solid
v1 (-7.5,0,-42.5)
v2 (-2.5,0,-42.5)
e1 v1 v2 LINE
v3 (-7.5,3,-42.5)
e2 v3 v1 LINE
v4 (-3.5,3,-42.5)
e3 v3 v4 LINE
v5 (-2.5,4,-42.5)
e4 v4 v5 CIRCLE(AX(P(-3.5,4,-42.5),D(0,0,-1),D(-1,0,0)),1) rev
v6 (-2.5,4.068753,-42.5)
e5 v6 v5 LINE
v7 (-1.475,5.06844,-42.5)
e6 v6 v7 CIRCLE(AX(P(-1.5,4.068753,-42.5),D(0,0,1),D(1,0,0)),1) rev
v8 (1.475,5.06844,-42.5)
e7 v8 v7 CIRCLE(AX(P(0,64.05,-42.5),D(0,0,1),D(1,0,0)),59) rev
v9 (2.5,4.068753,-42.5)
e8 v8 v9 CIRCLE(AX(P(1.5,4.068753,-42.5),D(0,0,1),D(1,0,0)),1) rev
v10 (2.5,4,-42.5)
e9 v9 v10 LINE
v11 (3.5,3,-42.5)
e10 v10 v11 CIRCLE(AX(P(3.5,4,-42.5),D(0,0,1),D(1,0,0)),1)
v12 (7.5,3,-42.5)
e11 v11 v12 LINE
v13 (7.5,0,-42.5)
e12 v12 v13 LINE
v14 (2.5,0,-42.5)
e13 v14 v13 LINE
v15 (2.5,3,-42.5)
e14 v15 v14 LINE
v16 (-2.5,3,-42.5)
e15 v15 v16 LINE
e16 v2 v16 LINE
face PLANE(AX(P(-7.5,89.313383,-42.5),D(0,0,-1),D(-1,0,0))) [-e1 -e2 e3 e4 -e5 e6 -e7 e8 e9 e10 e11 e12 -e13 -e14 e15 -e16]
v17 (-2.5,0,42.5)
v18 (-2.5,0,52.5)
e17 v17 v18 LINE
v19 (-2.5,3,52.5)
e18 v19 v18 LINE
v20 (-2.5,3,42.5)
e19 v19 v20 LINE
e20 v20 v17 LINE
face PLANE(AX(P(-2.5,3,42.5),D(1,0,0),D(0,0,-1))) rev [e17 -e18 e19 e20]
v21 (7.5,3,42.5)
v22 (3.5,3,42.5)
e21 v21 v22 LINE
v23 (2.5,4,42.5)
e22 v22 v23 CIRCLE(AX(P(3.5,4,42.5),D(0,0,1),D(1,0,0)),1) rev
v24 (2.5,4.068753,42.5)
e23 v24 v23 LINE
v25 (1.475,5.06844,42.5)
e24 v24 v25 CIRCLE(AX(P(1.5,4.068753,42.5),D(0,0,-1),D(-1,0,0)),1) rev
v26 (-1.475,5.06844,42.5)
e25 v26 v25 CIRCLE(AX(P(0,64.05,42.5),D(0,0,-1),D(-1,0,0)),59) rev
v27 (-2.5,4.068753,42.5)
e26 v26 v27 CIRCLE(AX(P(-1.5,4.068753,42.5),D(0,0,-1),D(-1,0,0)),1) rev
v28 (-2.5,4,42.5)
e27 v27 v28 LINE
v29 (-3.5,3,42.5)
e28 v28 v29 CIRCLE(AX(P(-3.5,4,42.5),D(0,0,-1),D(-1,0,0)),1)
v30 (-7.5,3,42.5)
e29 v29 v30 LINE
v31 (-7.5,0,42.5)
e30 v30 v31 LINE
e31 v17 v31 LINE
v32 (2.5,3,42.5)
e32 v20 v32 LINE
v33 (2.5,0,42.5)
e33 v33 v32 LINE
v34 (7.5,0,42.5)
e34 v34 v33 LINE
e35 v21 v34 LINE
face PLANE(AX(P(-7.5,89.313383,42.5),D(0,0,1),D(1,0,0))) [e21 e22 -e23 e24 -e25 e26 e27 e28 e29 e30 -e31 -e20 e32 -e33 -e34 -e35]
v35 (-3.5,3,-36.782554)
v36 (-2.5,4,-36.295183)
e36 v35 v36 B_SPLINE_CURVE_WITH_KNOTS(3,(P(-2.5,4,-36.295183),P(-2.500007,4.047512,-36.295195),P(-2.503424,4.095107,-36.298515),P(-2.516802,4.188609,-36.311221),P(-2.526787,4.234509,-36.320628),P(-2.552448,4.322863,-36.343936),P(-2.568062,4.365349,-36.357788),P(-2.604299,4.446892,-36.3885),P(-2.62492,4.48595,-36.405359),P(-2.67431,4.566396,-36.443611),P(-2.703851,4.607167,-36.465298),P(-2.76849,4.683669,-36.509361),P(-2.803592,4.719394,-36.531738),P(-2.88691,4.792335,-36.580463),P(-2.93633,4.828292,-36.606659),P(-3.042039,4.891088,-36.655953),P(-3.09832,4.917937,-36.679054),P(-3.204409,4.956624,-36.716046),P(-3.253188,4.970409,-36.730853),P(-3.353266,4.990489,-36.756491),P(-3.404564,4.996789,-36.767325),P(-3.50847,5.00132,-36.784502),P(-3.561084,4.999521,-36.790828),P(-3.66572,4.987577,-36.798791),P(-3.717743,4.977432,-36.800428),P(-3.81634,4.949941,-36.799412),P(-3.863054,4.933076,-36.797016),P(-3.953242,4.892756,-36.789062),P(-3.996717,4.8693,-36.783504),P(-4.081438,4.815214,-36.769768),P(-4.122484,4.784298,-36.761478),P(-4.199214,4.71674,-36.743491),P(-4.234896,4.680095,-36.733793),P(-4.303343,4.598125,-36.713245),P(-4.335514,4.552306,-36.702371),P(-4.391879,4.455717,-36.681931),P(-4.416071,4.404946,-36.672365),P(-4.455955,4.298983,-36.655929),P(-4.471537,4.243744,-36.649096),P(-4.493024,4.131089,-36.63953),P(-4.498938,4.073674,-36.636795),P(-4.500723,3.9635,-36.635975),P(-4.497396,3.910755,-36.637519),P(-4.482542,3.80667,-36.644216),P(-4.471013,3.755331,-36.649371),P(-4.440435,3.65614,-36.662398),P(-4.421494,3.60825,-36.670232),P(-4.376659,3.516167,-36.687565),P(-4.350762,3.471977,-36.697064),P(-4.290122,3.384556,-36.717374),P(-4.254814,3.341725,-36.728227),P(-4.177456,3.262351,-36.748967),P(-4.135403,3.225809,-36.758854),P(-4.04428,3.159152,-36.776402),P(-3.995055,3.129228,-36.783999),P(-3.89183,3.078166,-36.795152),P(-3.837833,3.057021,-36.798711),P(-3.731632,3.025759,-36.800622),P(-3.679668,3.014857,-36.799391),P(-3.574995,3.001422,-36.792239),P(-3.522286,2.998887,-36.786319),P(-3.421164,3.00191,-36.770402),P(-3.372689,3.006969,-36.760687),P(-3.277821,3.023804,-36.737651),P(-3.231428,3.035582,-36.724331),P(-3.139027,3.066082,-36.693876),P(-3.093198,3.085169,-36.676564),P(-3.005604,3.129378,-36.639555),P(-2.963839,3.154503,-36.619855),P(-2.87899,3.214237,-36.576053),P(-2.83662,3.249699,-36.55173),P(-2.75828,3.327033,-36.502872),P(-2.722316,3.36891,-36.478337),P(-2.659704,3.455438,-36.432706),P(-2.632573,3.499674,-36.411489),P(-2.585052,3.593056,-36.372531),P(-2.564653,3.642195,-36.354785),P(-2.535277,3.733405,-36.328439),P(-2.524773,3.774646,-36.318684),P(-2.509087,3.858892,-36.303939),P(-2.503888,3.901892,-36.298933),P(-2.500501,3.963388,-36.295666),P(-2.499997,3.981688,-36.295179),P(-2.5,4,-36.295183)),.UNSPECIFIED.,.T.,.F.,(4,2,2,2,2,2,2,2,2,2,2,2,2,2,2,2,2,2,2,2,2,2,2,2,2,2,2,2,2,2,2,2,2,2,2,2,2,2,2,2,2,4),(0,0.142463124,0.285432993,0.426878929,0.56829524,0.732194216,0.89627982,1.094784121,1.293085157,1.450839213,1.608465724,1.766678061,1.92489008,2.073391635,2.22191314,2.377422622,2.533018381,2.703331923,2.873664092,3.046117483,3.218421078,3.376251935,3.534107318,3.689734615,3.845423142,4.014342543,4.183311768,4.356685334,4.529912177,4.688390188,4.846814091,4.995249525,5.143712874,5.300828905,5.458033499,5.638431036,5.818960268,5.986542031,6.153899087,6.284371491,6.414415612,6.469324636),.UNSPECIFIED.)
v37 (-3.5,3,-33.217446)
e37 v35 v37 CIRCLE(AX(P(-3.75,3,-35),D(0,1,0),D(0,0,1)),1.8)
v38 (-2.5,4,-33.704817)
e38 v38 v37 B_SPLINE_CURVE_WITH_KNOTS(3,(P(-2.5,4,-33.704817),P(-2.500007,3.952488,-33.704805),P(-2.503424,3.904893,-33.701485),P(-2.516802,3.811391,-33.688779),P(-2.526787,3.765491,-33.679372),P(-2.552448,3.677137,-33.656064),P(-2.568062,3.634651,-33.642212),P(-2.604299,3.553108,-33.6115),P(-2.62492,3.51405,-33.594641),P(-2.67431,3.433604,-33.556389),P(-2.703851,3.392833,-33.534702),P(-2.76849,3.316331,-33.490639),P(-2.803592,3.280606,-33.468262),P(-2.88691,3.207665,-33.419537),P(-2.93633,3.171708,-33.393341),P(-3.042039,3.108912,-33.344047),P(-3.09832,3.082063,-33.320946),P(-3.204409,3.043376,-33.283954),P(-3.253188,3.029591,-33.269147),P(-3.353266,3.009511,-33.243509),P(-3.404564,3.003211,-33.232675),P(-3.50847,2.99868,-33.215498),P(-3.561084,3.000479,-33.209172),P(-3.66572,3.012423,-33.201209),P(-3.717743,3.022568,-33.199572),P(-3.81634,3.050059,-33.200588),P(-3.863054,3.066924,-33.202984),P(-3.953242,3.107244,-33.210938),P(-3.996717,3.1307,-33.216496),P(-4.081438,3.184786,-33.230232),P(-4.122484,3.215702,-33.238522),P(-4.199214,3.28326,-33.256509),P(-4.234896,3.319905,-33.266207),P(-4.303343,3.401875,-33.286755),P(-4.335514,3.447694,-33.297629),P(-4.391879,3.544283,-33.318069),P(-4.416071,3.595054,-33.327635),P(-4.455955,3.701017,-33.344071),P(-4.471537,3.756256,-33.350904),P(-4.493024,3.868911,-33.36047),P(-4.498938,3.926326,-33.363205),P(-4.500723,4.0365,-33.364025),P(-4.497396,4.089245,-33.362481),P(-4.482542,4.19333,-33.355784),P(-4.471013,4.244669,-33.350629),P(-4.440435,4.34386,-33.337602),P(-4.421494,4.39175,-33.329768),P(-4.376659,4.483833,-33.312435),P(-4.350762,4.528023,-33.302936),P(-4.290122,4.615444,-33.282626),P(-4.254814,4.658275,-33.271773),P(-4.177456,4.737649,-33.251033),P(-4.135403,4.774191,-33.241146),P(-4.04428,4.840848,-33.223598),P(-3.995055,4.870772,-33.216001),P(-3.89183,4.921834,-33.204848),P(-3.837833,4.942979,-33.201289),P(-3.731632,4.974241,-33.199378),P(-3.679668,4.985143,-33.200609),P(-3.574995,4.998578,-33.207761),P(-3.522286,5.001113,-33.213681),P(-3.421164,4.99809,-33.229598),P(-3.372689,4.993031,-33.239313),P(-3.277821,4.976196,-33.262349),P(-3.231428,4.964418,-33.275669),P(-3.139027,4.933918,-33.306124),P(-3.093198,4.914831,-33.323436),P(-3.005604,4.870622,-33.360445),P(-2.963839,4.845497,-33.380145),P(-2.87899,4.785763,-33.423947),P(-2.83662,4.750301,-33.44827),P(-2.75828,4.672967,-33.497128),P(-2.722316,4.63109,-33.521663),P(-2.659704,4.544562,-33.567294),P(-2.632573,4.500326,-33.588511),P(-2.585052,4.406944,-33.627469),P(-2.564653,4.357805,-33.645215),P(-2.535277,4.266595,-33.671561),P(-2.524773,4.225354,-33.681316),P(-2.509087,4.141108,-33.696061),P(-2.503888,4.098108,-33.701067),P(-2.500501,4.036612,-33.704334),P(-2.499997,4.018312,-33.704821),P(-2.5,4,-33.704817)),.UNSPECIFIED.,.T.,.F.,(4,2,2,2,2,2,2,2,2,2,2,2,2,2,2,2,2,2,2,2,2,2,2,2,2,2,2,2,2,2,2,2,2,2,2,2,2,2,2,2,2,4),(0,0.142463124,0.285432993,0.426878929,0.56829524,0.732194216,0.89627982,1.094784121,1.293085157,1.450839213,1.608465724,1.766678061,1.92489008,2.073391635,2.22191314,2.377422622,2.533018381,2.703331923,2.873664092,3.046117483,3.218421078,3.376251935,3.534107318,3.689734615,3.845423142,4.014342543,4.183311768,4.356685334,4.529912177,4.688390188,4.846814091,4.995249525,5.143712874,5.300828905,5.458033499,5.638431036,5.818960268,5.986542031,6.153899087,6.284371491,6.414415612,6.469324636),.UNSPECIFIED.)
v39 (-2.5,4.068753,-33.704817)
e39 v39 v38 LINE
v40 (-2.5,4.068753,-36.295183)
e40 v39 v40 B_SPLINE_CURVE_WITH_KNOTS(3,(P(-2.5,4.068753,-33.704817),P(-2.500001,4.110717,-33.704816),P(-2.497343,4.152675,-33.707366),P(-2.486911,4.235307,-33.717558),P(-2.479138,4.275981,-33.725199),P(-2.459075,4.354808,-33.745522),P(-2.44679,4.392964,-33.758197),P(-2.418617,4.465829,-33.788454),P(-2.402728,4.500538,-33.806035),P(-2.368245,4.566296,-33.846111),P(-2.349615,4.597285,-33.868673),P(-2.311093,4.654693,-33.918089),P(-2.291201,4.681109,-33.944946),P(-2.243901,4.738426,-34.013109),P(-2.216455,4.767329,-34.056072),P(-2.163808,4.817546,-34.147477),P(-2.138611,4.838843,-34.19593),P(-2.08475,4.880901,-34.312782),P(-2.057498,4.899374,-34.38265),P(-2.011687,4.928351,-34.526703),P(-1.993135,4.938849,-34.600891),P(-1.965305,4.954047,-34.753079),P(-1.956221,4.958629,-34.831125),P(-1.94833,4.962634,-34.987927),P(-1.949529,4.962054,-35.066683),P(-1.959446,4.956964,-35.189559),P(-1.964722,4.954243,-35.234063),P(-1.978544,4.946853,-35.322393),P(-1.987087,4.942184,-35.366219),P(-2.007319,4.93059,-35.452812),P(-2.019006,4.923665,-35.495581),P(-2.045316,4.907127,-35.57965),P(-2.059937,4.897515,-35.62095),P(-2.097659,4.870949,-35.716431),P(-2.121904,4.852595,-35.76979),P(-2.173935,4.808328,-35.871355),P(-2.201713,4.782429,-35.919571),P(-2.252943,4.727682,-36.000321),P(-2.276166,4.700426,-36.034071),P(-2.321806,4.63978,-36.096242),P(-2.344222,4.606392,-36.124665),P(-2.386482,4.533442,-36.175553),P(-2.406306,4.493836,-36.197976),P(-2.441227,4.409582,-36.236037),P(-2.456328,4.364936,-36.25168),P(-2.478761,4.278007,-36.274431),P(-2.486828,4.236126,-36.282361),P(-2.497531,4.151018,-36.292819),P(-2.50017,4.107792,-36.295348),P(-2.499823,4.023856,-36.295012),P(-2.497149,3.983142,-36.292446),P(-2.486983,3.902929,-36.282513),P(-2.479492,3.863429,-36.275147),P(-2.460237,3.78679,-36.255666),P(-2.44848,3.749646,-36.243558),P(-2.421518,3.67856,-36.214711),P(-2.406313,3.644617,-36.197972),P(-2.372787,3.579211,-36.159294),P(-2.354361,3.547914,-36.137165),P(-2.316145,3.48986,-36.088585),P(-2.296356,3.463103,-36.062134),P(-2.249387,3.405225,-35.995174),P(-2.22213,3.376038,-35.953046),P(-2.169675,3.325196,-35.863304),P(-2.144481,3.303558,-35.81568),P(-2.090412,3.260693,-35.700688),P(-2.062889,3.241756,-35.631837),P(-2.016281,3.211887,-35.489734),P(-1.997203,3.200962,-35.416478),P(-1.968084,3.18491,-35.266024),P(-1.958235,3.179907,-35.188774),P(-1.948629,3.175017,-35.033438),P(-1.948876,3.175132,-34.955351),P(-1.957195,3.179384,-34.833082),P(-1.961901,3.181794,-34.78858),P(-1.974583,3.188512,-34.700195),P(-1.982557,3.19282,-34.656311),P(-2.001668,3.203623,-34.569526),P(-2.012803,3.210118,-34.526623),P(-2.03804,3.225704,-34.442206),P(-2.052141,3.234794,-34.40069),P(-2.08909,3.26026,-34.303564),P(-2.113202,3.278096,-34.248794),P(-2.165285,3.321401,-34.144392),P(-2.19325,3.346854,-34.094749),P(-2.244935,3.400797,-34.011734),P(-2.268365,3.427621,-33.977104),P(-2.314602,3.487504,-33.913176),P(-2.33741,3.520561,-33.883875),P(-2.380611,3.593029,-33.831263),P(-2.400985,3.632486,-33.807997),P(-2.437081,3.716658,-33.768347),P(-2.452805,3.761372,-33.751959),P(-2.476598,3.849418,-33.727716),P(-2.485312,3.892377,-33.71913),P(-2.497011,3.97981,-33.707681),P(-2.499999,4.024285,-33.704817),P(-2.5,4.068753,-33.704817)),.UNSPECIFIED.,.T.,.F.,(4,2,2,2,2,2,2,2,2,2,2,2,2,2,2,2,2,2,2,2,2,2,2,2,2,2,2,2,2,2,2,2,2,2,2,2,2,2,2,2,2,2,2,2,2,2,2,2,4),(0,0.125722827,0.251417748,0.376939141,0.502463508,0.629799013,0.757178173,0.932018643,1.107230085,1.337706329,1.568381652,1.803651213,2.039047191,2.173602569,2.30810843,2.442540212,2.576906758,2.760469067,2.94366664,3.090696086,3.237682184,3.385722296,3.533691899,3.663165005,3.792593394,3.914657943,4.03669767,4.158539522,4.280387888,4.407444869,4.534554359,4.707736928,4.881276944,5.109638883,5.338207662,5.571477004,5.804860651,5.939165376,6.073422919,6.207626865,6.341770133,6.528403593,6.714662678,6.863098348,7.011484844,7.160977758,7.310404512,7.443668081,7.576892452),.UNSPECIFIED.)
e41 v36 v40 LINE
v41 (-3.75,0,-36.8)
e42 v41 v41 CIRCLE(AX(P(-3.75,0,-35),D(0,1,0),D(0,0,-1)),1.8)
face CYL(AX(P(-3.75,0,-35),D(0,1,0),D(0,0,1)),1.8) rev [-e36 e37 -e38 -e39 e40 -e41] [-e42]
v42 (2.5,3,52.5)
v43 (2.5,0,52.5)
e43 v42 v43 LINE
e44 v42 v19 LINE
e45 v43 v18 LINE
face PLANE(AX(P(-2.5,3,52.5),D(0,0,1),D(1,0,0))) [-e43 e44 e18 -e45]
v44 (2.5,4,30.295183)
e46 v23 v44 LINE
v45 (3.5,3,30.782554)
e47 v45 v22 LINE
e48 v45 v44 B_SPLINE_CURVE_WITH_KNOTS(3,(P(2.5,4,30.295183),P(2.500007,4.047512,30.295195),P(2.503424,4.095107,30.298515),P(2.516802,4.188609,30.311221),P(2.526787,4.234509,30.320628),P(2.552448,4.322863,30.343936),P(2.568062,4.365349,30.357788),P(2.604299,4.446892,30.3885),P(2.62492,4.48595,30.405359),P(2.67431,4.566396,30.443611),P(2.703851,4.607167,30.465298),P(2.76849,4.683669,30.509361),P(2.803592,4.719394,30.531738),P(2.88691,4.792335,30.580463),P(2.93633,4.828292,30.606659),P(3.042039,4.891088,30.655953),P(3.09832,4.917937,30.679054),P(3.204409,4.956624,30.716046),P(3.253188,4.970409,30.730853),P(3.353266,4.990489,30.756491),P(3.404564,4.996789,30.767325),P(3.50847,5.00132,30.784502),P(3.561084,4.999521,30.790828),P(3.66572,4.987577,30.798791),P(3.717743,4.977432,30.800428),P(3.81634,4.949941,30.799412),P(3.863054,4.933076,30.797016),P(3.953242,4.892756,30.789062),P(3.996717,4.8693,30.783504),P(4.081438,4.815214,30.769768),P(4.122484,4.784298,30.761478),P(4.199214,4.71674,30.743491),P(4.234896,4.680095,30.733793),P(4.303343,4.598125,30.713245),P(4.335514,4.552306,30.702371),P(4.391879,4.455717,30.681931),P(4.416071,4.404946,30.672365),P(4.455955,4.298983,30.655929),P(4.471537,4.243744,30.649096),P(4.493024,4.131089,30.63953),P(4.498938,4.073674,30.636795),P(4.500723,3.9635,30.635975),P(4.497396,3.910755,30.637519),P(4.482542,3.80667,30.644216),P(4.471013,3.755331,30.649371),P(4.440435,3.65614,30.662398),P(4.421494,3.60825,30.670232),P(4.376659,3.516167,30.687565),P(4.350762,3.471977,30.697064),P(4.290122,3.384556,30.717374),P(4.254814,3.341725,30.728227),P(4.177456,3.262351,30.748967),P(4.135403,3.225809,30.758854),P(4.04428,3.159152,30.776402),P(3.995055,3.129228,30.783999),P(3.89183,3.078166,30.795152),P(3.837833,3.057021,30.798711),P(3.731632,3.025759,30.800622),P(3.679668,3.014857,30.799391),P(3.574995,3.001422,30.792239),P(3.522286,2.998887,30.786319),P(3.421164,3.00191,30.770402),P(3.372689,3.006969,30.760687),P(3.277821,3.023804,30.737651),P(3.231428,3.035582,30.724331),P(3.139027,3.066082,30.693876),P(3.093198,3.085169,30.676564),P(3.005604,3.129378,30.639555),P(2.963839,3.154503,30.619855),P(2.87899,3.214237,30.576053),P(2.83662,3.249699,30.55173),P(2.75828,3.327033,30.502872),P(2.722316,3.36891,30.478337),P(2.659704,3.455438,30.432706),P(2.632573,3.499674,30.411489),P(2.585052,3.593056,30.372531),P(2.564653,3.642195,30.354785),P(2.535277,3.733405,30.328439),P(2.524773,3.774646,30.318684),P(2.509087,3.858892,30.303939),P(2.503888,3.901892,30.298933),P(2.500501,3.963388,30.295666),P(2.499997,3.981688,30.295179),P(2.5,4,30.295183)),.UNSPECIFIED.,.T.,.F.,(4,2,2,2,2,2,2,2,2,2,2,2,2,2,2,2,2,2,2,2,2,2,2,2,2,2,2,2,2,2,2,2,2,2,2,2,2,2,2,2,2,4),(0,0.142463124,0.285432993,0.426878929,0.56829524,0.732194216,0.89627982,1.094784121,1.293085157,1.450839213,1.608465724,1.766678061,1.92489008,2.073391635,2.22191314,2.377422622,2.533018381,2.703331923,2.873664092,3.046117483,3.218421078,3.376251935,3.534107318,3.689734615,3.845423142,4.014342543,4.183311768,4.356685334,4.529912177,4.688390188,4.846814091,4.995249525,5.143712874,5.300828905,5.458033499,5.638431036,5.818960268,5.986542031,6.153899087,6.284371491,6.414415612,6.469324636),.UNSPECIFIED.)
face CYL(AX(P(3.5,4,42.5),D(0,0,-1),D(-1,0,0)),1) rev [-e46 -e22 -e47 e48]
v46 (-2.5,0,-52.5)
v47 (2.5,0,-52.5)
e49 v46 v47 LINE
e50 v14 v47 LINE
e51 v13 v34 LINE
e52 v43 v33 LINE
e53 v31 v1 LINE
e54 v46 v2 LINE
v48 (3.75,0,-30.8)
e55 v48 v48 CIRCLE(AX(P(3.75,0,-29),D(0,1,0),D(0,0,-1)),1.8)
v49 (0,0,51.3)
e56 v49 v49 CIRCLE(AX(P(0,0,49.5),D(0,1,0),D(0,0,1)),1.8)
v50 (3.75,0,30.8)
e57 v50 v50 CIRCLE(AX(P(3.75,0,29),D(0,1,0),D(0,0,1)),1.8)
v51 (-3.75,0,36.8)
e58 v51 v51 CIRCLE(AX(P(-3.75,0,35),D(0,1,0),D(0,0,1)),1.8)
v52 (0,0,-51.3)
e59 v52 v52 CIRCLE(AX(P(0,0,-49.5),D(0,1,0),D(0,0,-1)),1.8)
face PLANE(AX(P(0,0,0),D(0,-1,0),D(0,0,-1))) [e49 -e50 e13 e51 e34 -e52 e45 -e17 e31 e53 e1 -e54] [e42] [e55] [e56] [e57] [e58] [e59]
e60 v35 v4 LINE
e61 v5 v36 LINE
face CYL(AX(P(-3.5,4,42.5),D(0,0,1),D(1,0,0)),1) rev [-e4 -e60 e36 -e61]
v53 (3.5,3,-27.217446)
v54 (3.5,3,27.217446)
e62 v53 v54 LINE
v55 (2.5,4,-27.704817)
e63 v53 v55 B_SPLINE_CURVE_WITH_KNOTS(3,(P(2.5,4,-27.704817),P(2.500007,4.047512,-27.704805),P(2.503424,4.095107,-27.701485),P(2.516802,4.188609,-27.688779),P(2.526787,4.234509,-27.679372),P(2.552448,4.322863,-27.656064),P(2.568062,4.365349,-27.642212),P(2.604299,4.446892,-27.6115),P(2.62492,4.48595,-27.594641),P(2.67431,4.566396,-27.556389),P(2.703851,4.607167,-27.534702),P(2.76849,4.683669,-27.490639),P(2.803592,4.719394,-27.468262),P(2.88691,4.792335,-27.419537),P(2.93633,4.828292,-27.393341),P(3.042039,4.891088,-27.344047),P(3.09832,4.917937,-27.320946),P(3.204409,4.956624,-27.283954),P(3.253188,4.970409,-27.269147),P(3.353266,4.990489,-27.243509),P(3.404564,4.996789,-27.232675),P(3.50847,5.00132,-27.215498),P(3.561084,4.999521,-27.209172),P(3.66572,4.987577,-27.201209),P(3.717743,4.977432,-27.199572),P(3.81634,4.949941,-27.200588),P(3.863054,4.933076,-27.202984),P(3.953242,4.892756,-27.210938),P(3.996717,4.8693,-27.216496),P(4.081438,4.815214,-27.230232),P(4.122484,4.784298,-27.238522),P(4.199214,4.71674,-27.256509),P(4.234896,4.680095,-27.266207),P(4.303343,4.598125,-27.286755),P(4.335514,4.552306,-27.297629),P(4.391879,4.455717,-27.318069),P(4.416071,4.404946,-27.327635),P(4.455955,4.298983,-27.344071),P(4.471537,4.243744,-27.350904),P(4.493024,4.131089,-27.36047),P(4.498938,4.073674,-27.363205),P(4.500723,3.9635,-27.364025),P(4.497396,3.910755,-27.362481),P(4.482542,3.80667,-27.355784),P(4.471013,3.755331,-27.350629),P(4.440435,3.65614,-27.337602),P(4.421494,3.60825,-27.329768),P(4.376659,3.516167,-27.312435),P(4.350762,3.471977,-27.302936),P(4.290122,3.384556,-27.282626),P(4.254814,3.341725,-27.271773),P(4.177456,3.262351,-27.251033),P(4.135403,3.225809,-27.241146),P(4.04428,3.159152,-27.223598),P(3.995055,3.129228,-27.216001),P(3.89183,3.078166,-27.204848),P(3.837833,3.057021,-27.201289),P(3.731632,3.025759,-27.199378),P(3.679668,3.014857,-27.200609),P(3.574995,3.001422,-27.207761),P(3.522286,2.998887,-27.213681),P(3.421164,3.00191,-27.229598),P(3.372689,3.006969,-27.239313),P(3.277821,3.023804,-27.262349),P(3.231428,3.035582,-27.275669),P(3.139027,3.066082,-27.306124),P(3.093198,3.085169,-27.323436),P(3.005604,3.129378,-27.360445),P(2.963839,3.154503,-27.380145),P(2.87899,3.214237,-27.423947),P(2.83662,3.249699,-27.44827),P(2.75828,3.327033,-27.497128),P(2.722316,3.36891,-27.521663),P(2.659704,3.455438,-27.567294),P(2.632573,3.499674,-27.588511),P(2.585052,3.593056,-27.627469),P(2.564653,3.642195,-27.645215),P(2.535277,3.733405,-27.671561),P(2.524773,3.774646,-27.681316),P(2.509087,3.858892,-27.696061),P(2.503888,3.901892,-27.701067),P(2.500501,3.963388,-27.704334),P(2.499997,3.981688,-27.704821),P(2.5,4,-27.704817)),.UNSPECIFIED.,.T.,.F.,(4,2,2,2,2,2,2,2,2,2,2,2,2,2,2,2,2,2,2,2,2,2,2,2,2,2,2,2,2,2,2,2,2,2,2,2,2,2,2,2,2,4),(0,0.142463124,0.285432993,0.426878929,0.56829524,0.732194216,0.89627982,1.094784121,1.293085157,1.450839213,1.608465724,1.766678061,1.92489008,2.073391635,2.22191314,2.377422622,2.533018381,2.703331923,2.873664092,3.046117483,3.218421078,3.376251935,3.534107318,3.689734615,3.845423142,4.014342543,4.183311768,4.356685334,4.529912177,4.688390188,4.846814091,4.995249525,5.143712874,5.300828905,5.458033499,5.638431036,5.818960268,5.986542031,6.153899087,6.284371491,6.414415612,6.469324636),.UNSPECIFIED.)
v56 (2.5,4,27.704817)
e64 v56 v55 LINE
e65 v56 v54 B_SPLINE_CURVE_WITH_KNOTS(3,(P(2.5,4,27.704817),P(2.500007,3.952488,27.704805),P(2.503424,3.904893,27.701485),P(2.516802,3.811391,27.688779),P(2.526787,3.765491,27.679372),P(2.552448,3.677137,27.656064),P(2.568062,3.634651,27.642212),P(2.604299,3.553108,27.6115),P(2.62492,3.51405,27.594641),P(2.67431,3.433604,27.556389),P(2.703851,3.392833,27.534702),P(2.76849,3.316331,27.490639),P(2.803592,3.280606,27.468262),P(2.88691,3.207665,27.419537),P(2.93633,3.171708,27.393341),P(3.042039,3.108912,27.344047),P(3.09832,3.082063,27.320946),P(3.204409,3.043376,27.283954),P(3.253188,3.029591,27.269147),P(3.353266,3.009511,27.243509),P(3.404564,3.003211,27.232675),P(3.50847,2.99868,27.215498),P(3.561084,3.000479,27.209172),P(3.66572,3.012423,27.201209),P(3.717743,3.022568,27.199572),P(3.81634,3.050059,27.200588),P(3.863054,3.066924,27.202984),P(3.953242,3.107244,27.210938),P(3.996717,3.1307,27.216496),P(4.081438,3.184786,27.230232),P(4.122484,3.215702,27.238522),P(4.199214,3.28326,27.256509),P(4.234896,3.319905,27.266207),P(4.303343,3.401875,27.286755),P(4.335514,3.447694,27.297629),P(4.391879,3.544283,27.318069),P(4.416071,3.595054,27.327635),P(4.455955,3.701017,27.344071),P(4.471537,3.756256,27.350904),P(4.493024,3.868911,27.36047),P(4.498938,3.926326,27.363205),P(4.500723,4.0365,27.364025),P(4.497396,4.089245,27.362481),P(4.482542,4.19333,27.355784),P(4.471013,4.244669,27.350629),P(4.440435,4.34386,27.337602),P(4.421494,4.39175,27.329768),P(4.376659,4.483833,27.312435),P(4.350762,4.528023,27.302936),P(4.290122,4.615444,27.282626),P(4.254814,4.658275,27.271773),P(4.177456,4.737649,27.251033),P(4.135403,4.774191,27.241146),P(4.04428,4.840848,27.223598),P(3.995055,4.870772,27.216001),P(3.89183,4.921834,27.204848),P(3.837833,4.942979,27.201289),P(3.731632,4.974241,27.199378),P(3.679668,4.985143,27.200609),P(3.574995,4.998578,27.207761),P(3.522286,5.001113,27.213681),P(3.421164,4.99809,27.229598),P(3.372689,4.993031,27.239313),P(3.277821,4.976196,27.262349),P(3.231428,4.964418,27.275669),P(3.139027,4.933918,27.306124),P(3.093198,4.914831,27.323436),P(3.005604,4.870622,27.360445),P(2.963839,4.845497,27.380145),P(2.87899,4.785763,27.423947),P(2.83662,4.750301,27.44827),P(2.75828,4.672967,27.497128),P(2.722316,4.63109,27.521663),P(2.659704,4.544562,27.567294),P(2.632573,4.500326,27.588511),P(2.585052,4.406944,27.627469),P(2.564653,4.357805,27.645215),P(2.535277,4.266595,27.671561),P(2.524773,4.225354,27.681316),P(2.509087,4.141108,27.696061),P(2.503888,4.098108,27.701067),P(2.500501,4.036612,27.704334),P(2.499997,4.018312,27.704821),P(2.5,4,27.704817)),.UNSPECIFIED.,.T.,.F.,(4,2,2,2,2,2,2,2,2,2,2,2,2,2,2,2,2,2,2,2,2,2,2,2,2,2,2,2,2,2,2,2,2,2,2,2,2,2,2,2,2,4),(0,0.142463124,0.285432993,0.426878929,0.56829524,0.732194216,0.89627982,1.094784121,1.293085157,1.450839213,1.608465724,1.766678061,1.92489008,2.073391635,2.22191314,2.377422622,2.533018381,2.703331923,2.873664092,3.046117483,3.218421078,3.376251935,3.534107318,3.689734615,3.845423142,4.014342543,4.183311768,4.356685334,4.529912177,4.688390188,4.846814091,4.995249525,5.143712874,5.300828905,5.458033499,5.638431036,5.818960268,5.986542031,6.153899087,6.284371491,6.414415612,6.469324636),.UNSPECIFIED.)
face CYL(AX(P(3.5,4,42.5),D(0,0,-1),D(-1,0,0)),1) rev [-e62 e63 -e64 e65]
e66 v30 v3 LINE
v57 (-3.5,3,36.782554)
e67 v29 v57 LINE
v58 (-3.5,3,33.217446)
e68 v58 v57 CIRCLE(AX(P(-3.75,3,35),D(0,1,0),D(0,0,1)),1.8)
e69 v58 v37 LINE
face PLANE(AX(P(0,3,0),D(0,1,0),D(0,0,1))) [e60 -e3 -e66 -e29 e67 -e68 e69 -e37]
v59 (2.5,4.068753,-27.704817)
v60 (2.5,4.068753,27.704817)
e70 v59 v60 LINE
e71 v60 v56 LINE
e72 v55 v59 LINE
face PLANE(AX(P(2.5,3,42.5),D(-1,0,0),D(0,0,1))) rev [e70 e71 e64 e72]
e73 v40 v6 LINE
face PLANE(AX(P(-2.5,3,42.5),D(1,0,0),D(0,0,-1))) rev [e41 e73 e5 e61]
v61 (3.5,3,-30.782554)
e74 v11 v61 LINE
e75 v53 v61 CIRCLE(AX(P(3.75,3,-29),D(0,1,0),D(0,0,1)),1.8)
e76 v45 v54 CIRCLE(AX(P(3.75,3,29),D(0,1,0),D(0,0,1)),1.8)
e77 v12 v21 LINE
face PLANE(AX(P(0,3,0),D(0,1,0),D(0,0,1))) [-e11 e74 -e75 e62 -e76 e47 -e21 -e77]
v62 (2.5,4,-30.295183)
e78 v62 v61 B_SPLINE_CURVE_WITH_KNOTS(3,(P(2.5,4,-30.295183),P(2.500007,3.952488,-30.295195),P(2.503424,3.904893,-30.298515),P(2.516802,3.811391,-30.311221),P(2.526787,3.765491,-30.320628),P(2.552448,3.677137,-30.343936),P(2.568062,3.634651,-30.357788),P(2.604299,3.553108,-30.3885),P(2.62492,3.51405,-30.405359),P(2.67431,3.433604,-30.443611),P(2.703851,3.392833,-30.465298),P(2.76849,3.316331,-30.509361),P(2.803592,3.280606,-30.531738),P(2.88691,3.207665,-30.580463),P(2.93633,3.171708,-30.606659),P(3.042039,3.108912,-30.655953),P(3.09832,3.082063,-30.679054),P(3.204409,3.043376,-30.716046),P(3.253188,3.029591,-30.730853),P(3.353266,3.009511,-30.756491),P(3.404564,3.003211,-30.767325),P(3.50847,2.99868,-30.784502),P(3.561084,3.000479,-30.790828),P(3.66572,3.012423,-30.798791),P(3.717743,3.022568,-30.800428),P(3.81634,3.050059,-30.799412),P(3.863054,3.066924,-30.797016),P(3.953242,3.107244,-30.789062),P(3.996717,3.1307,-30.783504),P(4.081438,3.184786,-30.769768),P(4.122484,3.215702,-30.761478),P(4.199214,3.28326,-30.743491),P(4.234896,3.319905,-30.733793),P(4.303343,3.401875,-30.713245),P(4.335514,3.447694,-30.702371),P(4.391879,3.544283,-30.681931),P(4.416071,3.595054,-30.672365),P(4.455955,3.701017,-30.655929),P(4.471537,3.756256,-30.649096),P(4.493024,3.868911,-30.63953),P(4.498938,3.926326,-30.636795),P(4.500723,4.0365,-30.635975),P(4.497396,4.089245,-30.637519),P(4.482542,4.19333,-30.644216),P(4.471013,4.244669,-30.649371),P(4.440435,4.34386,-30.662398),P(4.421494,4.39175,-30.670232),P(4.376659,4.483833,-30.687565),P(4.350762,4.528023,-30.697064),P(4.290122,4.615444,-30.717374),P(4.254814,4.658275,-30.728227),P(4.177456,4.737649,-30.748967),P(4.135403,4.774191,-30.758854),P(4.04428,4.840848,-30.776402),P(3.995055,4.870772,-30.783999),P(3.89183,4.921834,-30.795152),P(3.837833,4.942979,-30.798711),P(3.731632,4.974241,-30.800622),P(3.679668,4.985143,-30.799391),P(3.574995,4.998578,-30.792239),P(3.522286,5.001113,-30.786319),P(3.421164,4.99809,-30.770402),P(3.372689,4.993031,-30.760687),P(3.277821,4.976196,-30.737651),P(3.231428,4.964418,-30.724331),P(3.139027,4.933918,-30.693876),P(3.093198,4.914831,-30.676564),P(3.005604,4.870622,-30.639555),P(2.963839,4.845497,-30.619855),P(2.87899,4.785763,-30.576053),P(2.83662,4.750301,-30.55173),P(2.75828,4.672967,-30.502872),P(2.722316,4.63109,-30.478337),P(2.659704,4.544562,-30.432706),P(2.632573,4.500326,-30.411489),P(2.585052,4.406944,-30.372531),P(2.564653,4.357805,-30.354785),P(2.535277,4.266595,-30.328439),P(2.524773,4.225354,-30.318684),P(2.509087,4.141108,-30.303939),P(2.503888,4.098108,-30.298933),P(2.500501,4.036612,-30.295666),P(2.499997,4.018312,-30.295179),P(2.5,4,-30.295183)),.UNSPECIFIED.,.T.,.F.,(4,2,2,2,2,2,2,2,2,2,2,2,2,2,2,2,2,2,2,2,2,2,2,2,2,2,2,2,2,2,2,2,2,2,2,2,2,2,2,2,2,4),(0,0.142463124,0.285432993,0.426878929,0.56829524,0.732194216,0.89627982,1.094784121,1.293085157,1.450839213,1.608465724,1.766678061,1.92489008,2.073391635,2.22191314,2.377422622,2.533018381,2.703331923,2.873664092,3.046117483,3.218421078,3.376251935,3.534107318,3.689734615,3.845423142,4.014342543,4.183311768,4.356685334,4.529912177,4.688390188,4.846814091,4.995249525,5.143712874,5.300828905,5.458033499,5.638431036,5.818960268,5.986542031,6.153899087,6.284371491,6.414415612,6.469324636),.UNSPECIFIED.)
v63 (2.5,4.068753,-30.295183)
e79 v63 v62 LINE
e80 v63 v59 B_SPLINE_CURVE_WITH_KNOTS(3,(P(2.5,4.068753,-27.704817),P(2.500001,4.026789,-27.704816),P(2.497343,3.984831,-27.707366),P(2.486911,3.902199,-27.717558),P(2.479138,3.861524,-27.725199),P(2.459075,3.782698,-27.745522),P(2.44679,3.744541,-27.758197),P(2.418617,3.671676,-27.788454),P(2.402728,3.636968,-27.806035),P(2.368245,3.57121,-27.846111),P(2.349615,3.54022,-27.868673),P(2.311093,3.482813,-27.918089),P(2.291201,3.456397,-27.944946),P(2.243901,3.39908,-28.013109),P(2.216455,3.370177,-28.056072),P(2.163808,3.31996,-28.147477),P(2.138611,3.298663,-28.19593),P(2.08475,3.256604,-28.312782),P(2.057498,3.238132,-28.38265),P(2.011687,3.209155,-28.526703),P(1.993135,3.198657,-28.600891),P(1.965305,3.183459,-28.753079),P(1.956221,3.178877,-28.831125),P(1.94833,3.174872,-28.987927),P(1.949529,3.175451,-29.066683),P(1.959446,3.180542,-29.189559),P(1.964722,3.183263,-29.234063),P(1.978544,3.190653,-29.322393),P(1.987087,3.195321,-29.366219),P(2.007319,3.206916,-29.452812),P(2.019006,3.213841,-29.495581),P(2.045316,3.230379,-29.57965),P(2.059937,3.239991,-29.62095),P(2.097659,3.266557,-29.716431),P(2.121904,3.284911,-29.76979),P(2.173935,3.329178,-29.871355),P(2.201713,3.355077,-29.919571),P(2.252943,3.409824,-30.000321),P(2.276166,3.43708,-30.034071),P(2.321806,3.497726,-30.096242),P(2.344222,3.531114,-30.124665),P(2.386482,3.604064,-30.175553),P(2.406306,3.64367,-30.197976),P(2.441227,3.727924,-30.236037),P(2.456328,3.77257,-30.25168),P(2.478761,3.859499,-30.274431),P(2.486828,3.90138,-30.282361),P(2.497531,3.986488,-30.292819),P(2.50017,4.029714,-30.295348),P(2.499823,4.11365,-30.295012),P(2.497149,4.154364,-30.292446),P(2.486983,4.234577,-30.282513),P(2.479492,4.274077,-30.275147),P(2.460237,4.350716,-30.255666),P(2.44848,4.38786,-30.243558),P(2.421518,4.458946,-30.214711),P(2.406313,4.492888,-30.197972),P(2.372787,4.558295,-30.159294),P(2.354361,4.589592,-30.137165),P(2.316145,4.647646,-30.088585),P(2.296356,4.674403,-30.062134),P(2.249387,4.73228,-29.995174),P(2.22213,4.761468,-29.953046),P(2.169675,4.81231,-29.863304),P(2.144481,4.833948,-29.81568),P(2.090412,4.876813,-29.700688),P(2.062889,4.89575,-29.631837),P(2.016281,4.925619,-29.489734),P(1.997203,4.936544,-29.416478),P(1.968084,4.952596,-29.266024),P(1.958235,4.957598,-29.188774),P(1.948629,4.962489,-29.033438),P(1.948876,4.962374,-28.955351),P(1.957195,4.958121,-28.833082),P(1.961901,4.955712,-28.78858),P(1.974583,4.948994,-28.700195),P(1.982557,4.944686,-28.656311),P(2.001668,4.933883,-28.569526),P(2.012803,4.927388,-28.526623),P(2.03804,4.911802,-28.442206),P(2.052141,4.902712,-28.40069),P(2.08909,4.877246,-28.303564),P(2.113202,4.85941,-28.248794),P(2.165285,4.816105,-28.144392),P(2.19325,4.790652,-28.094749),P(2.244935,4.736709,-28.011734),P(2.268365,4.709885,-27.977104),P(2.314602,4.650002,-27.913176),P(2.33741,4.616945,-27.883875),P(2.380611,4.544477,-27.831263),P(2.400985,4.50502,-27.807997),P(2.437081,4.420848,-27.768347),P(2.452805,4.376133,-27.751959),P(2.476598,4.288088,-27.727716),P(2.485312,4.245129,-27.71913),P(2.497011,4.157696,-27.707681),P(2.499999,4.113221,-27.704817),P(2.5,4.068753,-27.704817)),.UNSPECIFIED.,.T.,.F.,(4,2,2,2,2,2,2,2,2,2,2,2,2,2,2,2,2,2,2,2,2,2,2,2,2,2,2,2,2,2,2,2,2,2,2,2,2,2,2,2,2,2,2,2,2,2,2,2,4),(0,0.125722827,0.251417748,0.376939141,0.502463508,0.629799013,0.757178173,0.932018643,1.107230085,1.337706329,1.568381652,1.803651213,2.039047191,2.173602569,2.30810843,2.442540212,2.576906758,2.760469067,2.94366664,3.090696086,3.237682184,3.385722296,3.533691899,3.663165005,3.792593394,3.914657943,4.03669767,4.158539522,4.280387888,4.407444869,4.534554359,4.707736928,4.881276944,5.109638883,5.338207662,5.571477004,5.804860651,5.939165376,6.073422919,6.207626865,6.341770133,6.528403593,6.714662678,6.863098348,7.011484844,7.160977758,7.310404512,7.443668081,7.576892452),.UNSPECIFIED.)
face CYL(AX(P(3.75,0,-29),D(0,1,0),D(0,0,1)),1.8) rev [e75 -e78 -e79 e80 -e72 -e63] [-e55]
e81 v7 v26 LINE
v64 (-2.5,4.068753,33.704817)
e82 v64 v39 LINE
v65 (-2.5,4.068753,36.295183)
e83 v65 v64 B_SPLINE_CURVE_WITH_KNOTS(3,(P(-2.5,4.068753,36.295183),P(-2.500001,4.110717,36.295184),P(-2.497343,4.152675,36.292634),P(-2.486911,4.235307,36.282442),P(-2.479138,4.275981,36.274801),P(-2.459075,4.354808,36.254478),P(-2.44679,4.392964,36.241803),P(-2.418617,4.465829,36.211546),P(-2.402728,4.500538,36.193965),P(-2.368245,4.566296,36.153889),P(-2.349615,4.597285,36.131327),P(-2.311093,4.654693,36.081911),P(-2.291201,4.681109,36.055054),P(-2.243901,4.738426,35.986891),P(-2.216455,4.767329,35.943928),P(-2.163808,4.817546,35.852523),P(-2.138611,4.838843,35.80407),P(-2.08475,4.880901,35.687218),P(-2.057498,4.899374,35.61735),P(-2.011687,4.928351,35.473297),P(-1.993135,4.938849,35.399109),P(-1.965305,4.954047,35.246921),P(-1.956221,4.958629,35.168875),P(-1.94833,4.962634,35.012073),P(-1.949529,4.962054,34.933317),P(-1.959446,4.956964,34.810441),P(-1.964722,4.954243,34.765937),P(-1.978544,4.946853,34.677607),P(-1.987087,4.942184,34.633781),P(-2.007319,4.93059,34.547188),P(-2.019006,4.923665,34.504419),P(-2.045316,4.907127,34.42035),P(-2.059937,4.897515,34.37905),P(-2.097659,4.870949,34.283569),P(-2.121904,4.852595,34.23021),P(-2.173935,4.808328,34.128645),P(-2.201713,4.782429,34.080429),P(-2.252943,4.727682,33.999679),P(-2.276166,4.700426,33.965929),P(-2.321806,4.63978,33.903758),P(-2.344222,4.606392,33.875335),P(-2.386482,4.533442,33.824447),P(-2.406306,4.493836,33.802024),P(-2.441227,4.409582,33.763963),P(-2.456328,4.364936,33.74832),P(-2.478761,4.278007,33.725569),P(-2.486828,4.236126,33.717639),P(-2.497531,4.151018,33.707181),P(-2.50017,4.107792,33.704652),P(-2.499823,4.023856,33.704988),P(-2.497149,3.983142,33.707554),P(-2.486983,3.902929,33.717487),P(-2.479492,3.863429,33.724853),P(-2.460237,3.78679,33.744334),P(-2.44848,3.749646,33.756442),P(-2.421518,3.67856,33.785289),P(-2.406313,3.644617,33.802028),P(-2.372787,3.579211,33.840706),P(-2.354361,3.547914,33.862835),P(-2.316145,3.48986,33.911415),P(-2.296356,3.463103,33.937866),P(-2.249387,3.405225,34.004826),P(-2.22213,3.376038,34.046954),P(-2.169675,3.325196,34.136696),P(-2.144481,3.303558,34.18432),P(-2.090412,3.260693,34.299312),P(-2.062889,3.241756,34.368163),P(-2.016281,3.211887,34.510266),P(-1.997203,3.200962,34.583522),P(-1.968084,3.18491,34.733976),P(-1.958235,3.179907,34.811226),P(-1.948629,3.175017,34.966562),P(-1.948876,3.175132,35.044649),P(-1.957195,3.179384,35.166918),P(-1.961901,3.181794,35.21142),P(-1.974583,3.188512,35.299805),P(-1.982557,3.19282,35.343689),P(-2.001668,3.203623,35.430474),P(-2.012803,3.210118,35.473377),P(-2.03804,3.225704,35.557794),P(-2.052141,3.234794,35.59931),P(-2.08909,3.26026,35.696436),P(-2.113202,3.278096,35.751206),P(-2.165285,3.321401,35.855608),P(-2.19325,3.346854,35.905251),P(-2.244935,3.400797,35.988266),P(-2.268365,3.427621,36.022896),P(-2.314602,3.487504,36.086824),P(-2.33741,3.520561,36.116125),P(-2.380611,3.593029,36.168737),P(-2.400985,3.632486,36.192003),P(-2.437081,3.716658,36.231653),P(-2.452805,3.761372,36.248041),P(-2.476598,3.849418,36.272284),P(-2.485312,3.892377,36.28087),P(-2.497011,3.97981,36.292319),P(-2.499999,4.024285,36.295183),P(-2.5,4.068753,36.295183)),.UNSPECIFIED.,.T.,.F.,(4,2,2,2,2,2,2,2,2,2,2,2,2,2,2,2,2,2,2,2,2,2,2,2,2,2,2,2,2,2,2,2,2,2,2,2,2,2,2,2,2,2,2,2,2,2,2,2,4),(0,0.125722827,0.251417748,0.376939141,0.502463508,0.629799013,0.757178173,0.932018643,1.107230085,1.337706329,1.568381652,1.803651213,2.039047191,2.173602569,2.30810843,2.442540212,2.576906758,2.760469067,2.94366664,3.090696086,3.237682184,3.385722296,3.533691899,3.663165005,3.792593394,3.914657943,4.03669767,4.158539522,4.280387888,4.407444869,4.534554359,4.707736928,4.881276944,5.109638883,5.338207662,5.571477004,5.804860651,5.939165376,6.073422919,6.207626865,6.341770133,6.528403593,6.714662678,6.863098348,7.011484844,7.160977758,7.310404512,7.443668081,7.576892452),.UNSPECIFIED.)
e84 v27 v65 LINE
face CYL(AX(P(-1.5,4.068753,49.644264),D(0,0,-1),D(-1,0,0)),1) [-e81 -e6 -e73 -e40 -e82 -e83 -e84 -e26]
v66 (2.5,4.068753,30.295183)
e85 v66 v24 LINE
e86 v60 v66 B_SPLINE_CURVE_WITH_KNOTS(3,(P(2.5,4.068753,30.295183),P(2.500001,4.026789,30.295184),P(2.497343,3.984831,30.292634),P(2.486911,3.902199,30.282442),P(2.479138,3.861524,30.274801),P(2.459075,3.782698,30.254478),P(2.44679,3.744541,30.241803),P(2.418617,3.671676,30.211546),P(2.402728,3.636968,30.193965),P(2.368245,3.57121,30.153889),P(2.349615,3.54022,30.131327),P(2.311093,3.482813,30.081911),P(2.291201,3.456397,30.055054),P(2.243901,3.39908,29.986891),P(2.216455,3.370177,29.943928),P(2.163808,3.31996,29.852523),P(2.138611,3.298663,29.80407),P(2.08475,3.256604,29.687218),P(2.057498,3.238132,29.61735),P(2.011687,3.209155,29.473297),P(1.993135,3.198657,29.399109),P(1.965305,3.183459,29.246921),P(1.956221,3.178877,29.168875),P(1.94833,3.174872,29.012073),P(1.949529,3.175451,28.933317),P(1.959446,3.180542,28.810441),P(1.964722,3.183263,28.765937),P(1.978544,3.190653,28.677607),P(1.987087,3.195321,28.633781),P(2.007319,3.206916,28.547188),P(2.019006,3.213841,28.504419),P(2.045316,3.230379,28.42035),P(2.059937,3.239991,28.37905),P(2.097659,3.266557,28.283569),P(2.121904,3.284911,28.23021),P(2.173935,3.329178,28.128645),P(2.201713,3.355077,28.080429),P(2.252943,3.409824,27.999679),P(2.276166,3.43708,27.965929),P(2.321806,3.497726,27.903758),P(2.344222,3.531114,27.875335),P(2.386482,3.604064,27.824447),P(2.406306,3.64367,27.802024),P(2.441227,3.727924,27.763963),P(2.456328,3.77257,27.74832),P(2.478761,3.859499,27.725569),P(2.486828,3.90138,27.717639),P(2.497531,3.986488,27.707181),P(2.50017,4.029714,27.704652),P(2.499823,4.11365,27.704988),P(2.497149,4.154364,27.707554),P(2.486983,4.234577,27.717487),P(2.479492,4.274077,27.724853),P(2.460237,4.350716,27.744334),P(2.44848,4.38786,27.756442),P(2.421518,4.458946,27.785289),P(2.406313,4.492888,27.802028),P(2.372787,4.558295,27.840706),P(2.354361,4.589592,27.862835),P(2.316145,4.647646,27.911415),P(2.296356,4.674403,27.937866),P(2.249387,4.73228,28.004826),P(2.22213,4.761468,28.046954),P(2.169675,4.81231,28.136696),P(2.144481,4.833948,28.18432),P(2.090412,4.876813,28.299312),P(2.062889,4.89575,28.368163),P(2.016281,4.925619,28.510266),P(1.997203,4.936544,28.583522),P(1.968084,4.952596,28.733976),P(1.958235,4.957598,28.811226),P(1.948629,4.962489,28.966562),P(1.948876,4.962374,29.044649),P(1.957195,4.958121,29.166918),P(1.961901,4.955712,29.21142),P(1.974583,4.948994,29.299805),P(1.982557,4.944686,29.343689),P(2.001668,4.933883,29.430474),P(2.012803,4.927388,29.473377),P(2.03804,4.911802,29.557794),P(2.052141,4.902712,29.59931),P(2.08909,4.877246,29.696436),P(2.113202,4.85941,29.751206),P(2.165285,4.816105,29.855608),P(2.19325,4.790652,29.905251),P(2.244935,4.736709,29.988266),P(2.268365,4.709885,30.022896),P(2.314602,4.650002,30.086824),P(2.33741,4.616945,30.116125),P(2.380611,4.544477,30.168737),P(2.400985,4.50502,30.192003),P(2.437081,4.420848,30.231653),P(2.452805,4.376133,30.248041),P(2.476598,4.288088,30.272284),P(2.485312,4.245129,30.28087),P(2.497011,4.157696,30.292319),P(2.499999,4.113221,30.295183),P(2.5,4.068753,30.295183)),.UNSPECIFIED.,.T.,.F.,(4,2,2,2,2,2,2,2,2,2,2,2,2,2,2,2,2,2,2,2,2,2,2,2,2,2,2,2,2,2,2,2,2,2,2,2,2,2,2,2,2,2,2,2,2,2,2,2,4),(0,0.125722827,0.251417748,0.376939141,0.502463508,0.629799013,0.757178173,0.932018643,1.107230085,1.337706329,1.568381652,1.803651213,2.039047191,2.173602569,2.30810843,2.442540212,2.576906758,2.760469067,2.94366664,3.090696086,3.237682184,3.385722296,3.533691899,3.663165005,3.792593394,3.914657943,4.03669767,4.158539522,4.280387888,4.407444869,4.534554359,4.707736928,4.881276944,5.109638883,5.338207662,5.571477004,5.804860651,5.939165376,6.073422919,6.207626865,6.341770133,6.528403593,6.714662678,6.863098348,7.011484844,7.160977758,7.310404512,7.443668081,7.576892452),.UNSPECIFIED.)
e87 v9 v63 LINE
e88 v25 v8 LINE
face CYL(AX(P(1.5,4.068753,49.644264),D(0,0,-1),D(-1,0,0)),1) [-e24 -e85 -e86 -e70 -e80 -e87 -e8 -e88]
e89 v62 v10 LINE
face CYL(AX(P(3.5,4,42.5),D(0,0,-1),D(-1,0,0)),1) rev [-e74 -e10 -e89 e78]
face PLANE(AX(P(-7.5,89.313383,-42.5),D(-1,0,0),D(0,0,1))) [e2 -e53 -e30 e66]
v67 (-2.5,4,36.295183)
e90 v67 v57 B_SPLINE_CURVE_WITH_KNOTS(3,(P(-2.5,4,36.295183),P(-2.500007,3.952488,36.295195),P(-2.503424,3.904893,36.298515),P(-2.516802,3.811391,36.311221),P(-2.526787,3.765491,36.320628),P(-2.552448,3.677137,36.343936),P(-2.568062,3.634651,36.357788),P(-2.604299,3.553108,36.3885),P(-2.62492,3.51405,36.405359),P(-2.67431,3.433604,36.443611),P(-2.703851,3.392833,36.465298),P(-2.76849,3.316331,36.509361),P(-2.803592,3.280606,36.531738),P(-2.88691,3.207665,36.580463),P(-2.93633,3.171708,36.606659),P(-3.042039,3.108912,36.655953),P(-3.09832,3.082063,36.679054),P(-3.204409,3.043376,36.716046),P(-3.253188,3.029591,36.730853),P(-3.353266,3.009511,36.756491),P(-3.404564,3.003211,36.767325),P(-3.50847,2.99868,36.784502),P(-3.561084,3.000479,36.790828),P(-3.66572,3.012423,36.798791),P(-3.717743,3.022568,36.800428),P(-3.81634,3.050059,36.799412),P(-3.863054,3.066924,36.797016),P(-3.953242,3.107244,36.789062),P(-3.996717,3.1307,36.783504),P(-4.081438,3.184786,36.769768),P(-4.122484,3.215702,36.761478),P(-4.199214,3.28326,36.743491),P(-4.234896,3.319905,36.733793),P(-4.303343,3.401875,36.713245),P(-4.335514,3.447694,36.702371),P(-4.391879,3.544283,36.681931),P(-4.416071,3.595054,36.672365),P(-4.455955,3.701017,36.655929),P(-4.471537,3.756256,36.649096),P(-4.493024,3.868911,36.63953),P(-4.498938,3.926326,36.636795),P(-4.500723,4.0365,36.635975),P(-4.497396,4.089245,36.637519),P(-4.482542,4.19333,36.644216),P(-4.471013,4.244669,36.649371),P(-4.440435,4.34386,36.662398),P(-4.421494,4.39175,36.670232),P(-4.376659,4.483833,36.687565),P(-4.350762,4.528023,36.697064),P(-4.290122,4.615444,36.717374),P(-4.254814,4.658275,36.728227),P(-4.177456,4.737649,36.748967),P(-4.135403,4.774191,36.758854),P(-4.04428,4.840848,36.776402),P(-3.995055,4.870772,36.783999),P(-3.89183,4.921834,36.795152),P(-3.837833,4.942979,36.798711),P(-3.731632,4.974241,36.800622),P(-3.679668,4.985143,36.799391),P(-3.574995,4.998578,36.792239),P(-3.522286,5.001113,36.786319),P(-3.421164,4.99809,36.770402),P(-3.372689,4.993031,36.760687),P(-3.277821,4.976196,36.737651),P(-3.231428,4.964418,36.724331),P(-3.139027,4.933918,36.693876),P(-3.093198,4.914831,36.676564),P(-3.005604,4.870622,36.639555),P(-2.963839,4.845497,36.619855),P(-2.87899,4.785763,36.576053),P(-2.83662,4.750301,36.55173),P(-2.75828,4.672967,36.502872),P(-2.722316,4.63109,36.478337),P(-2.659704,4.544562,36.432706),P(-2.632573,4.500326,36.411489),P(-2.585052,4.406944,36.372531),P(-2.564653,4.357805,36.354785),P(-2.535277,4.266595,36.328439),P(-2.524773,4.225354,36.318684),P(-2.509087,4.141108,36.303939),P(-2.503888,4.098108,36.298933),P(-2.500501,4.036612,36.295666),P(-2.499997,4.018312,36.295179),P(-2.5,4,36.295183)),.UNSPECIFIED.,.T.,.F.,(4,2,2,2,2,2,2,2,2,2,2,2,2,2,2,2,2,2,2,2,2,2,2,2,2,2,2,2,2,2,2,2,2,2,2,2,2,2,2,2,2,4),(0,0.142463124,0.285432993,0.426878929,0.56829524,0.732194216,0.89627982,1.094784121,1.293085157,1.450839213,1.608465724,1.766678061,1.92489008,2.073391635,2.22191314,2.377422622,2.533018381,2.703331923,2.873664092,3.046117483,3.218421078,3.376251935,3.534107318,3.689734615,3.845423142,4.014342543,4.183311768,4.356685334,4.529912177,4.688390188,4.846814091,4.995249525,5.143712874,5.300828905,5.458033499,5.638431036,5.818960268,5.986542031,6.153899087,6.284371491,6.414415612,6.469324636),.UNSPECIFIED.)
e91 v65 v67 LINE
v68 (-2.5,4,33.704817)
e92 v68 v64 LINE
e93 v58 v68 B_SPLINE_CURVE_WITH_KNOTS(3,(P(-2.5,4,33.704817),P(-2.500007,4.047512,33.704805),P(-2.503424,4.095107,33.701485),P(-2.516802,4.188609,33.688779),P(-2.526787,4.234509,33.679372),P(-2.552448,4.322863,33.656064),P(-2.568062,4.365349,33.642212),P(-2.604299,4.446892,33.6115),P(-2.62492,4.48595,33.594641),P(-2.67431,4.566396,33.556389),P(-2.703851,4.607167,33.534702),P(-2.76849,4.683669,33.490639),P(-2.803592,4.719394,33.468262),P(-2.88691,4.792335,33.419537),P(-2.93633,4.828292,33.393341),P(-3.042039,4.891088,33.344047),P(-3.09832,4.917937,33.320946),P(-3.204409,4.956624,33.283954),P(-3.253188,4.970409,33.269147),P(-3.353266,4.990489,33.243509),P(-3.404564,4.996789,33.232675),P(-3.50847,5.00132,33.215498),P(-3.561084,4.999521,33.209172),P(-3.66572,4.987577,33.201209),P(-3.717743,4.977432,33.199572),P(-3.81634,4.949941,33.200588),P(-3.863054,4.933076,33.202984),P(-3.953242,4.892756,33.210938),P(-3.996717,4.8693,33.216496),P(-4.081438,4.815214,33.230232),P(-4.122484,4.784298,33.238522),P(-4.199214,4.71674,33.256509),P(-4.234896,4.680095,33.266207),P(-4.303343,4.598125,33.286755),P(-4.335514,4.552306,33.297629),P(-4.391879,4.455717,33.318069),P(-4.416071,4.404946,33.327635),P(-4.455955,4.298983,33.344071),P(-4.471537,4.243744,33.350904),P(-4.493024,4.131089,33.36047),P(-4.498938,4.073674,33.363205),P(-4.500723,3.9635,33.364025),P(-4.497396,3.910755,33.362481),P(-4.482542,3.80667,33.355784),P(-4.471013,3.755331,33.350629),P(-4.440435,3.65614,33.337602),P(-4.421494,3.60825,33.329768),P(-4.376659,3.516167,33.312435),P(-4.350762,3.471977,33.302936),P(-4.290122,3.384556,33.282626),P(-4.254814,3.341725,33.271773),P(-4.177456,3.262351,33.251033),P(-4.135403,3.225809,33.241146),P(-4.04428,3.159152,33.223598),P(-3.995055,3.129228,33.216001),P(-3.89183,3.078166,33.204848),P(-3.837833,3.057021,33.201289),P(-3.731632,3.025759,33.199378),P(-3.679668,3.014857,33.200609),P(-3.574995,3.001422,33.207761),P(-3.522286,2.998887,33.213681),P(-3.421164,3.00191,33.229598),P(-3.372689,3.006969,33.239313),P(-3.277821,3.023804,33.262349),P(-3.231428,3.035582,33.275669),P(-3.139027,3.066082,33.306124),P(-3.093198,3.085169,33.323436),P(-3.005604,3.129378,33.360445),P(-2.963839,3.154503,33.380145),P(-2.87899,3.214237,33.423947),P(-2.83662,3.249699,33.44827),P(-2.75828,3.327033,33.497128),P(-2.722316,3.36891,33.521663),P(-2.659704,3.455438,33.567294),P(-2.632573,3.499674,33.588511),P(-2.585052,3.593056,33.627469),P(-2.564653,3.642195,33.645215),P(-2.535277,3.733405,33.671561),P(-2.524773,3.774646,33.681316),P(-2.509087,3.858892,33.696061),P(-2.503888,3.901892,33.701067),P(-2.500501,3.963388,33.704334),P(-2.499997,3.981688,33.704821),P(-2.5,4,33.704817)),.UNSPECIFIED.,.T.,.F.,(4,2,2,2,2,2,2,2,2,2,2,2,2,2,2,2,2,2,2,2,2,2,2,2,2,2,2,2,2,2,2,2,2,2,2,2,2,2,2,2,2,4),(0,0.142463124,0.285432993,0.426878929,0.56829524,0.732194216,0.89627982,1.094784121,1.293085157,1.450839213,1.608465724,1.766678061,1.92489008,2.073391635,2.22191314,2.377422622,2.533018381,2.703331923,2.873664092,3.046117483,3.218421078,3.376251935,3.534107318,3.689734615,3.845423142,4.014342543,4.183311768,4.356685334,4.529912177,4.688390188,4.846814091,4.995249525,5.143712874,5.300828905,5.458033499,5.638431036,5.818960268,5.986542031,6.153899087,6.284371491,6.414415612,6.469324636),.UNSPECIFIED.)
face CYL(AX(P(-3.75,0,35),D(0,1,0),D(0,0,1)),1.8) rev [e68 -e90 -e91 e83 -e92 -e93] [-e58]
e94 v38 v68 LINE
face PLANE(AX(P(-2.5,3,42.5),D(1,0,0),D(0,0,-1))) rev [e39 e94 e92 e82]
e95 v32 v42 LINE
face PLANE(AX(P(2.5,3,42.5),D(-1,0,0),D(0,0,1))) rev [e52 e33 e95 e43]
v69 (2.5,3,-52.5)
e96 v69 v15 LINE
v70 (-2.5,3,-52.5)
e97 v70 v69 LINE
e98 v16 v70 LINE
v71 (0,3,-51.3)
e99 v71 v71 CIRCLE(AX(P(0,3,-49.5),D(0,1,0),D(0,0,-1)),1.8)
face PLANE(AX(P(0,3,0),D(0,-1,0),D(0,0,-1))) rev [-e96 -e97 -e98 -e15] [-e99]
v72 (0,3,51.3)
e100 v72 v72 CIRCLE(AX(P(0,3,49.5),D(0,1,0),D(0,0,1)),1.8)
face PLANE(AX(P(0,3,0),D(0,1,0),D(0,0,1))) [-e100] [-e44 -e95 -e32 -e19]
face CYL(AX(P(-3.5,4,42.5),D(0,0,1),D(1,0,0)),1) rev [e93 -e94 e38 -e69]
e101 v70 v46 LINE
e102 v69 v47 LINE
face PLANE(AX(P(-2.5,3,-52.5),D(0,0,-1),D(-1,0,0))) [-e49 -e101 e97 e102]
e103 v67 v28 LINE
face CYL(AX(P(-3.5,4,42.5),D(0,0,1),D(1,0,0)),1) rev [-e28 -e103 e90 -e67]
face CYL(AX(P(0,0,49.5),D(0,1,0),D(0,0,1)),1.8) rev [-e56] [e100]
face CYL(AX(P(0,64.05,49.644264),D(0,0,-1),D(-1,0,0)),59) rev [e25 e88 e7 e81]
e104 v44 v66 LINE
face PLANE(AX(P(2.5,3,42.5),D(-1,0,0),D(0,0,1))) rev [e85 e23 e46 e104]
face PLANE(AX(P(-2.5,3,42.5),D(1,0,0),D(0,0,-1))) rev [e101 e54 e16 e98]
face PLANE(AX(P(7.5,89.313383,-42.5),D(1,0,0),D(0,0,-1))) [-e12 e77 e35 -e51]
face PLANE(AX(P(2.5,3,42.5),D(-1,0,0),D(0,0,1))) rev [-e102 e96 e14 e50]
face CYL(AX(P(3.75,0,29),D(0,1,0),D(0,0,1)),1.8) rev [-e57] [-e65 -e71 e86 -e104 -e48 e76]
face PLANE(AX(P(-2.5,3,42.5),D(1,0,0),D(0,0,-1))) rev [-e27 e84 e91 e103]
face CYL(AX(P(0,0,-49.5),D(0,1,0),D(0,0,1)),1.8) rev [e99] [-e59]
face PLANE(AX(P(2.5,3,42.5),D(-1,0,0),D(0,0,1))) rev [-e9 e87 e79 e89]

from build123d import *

# Parameters (mm, degrees)
SKETCH1_W               = 5
SKETCH1_H               = 85
BOSS_EXTRUDE1_DEPTH     = 3
BOSS_EXTRUDE2_DEPTH     = 42.5
BOSS_EXTRUDE3_START     = 42.5
BOSS_EXTRUDE3_DEPTH     = 42.5
SKETCH8_W               = 5
SKETCH8_H               = 10
BOSS_EXTRUDE4_DEPTH     = 3
SKETCH6_R               = 1.8
CUT_EXTRUDE1_DEPTH      = 53.645037753
SKETCH9_W               = 15
SKETCH9_H               = 85
BOSS_EXTRUDE5_DEPTH     = 3
FILLET1_R               = 1
CUT_EXTRUDE2_DEPTH      = 54.117793629
CUT_EXTRUDE2_DEPTH_BACK = 54.117793629
SKETCH10_R              = 1.8


with BuildPart() as part:
    # Sketch1 → Boss-Extrude1 (new body)
    with BuildSketch(Plane(origin=(0, 0, 0), x_dir=(1, 0, 0), z_dir=(0, 1, 0))):
        Rectangle(SKETCH1_W, SKETCH1_H)
    extrude(amount=BOSS_EXTRUDE1_DEPTH)

    # Sketch3 → Boss-Extrude2 (add)
    with BuildSketch(Plane.XY):
        with BuildLine():
            Line((-2.5, 3), (-2.5, 5.102989898))
            ThreePointArc((-2.5, 5.102989898), (0, 5.05), (2.5, 5.102989898))
            Line((2.5, 5.102989898), (2.5, 3))
            Line((2.5, 3), (2.5, 0))
            Line((2.5, 0), (-2.5, 0))
            Line((-2.5, 0), (-2.5, 3))
        make_face()
    extrude(amount=BOSS_EXTRUDE2_DEPTH)

    # Sketch7 → Boss-Extrude3 (add)
    with BuildSketch(Plane(origin=(0, 0, 0), x_dir=(-1, 0, 0), z_dir=(0, 0, -1)).offset(BOSS_EXTRUDE3_START)):
        with BuildLine():
            Line((-2.5, 5.102989898), (-2.5, 3))
            Line((-2.5, 3), (2.5, 3))
            Line((2.5, 3), (2.5, 5.102989898))
            ThreePointArc((2.5, 5.102989898), (0, 5.05), (-2.5, 5.102989898))
        make_face()
    extrude(amount=-BOSS_EXTRUDE3_DEPTH)

    # Sketch8 → Boss-Extrude4 (add)
    with BuildSketch(Plane.XZ):
        with Locations((0, 47.5)):
            Rectangle(SKETCH8_W, SKETCH8_H)
        with Locations((0, -47.5)):
            Rectangle(SKETCH8_W, SKETCH8_H)
    extrude(amount=-BOSS_EXTRUDE4_DEPTH)

    # Sketch6 → Cut-Extrude1 (cut, through all)
    with BuildSketch(Plane(origin=(0, 3, 0), x_dir=(1, 0, 0), z_dir=(0, 1, 0))):
        with Locations(Location((0, -49.5, 0), (0, 0, 270))):
            Circle(SKETCH6_R)
        with Locations(Location((0, 49.5, 0), (0, 0, 90))):
            Circle(SKETCH6_R)
    extrude(amount=-CUT_EXTRUDE1_DEPTH, mode=Mode.SUBTRACT)

    # Sketch9 → Boss-Extrude5 (add)
    with BuildSketch(Plane.XZ):
        Rectangle(SKETCH9_W, SKETCH9_H)
    extrude(amount=-BOSS_EXTRUDE5_DEPTH)

    # Fillet1
    # the kernel refuses this fillet: 1 mm, written as the material it adds along each edge
    with BuildSketch(Plane(origin=(2.5, 3, -42.5), x_dir=(0, 1, 0), z_dir=(0, 0, 1)), Plane(origin=(-2.5, 3, 42.5), x_dir=(0, 1, 0), z_dir=(0, 0, -1))) as fillet1_piece_1:
        with BuildLine():
            CenterArc((FILLET1_R, -FILLET1_R), FILLET1_R, 90, 90)
            Line((0, -FILLET1_R), (0, 0))
            Line((0, 0), (FILLET1_R, 0))
        make_face()
    extrude(amount=85)
    # the kernel refuses this fillet: 1 mm, written as the material it takes off along each edge
    with BuildSketch(Plane(origin=(-2.5, 5.102989898, 45.085592418), x_dir=(0, -1, 0), z_dir=(0, 0, -1))) as fillet1_2_piece_1:
        with BuildLine():
            CenterArc((1.034236967, -1), FILLET1_R, 90, 91.432543738)
            ThreePointArc((0.034549516, -1.025), (0.019501965, -0.512424928), (0, 0))
            Line((0, 0), (1.034236967, 0))
        make_face()
    extrude(amount=90.171184836, mode=Mode.SUBTRACT)
    with BuildSketch(Plane(origin=(2.5, 5.102989898, 45.085592418), x_dir=(0, -1, 0), z_dir=(0, 0, -1))) as fillet1_2_piece_2:
        with BuildLine():
            CenterArc((1.034236967, 1), FILLET1_R, 178.567456262, 91.432543738)
            ThreePointArc((0.034549516, 1.025), (0.019501965, 0.512424928), (0, 0))
            Line((0, 0), (1.034236967, 0))
        make_face()
    extrude(amount=90.171184836, mode=Mode.SUBTRACT)

    # Sketch10 → Cut-Extrude2 (cut, two sides: drawn at the far end of the back side and taken through both)
    with BuildSketch(Plane(origin=(0, 3, 0), x_dir=(1, 0, 0), z_dir=(0, 1, 0)).offset(-CUT_EXTRUDE2_DEPTH_BACK)):
        with Locations(Location((-3.75, -35, 0), (0, 0, 270))):
            Circle(SKETCH10_R)
        with Locations(Location((3.75, -29, 0), (0, 0, 270))):
            Circle(SKETCH10_R)
        with Locations(Location((3.75, 29, 0), (0, 0, 262.016443854))):
            Circle(SKETCH10_R)
        with Locations(Location((-3.75, 35, 0), (0, 0, 277.983556156))):
            Circle(SKETCH10_R)
    extrude(amount=CUT_EXTRUDE2_DEPTH + CUT_EXTRUDE2_DEPTH_BACK, mode=Mode.SUBTRACT)


solid = part.part
